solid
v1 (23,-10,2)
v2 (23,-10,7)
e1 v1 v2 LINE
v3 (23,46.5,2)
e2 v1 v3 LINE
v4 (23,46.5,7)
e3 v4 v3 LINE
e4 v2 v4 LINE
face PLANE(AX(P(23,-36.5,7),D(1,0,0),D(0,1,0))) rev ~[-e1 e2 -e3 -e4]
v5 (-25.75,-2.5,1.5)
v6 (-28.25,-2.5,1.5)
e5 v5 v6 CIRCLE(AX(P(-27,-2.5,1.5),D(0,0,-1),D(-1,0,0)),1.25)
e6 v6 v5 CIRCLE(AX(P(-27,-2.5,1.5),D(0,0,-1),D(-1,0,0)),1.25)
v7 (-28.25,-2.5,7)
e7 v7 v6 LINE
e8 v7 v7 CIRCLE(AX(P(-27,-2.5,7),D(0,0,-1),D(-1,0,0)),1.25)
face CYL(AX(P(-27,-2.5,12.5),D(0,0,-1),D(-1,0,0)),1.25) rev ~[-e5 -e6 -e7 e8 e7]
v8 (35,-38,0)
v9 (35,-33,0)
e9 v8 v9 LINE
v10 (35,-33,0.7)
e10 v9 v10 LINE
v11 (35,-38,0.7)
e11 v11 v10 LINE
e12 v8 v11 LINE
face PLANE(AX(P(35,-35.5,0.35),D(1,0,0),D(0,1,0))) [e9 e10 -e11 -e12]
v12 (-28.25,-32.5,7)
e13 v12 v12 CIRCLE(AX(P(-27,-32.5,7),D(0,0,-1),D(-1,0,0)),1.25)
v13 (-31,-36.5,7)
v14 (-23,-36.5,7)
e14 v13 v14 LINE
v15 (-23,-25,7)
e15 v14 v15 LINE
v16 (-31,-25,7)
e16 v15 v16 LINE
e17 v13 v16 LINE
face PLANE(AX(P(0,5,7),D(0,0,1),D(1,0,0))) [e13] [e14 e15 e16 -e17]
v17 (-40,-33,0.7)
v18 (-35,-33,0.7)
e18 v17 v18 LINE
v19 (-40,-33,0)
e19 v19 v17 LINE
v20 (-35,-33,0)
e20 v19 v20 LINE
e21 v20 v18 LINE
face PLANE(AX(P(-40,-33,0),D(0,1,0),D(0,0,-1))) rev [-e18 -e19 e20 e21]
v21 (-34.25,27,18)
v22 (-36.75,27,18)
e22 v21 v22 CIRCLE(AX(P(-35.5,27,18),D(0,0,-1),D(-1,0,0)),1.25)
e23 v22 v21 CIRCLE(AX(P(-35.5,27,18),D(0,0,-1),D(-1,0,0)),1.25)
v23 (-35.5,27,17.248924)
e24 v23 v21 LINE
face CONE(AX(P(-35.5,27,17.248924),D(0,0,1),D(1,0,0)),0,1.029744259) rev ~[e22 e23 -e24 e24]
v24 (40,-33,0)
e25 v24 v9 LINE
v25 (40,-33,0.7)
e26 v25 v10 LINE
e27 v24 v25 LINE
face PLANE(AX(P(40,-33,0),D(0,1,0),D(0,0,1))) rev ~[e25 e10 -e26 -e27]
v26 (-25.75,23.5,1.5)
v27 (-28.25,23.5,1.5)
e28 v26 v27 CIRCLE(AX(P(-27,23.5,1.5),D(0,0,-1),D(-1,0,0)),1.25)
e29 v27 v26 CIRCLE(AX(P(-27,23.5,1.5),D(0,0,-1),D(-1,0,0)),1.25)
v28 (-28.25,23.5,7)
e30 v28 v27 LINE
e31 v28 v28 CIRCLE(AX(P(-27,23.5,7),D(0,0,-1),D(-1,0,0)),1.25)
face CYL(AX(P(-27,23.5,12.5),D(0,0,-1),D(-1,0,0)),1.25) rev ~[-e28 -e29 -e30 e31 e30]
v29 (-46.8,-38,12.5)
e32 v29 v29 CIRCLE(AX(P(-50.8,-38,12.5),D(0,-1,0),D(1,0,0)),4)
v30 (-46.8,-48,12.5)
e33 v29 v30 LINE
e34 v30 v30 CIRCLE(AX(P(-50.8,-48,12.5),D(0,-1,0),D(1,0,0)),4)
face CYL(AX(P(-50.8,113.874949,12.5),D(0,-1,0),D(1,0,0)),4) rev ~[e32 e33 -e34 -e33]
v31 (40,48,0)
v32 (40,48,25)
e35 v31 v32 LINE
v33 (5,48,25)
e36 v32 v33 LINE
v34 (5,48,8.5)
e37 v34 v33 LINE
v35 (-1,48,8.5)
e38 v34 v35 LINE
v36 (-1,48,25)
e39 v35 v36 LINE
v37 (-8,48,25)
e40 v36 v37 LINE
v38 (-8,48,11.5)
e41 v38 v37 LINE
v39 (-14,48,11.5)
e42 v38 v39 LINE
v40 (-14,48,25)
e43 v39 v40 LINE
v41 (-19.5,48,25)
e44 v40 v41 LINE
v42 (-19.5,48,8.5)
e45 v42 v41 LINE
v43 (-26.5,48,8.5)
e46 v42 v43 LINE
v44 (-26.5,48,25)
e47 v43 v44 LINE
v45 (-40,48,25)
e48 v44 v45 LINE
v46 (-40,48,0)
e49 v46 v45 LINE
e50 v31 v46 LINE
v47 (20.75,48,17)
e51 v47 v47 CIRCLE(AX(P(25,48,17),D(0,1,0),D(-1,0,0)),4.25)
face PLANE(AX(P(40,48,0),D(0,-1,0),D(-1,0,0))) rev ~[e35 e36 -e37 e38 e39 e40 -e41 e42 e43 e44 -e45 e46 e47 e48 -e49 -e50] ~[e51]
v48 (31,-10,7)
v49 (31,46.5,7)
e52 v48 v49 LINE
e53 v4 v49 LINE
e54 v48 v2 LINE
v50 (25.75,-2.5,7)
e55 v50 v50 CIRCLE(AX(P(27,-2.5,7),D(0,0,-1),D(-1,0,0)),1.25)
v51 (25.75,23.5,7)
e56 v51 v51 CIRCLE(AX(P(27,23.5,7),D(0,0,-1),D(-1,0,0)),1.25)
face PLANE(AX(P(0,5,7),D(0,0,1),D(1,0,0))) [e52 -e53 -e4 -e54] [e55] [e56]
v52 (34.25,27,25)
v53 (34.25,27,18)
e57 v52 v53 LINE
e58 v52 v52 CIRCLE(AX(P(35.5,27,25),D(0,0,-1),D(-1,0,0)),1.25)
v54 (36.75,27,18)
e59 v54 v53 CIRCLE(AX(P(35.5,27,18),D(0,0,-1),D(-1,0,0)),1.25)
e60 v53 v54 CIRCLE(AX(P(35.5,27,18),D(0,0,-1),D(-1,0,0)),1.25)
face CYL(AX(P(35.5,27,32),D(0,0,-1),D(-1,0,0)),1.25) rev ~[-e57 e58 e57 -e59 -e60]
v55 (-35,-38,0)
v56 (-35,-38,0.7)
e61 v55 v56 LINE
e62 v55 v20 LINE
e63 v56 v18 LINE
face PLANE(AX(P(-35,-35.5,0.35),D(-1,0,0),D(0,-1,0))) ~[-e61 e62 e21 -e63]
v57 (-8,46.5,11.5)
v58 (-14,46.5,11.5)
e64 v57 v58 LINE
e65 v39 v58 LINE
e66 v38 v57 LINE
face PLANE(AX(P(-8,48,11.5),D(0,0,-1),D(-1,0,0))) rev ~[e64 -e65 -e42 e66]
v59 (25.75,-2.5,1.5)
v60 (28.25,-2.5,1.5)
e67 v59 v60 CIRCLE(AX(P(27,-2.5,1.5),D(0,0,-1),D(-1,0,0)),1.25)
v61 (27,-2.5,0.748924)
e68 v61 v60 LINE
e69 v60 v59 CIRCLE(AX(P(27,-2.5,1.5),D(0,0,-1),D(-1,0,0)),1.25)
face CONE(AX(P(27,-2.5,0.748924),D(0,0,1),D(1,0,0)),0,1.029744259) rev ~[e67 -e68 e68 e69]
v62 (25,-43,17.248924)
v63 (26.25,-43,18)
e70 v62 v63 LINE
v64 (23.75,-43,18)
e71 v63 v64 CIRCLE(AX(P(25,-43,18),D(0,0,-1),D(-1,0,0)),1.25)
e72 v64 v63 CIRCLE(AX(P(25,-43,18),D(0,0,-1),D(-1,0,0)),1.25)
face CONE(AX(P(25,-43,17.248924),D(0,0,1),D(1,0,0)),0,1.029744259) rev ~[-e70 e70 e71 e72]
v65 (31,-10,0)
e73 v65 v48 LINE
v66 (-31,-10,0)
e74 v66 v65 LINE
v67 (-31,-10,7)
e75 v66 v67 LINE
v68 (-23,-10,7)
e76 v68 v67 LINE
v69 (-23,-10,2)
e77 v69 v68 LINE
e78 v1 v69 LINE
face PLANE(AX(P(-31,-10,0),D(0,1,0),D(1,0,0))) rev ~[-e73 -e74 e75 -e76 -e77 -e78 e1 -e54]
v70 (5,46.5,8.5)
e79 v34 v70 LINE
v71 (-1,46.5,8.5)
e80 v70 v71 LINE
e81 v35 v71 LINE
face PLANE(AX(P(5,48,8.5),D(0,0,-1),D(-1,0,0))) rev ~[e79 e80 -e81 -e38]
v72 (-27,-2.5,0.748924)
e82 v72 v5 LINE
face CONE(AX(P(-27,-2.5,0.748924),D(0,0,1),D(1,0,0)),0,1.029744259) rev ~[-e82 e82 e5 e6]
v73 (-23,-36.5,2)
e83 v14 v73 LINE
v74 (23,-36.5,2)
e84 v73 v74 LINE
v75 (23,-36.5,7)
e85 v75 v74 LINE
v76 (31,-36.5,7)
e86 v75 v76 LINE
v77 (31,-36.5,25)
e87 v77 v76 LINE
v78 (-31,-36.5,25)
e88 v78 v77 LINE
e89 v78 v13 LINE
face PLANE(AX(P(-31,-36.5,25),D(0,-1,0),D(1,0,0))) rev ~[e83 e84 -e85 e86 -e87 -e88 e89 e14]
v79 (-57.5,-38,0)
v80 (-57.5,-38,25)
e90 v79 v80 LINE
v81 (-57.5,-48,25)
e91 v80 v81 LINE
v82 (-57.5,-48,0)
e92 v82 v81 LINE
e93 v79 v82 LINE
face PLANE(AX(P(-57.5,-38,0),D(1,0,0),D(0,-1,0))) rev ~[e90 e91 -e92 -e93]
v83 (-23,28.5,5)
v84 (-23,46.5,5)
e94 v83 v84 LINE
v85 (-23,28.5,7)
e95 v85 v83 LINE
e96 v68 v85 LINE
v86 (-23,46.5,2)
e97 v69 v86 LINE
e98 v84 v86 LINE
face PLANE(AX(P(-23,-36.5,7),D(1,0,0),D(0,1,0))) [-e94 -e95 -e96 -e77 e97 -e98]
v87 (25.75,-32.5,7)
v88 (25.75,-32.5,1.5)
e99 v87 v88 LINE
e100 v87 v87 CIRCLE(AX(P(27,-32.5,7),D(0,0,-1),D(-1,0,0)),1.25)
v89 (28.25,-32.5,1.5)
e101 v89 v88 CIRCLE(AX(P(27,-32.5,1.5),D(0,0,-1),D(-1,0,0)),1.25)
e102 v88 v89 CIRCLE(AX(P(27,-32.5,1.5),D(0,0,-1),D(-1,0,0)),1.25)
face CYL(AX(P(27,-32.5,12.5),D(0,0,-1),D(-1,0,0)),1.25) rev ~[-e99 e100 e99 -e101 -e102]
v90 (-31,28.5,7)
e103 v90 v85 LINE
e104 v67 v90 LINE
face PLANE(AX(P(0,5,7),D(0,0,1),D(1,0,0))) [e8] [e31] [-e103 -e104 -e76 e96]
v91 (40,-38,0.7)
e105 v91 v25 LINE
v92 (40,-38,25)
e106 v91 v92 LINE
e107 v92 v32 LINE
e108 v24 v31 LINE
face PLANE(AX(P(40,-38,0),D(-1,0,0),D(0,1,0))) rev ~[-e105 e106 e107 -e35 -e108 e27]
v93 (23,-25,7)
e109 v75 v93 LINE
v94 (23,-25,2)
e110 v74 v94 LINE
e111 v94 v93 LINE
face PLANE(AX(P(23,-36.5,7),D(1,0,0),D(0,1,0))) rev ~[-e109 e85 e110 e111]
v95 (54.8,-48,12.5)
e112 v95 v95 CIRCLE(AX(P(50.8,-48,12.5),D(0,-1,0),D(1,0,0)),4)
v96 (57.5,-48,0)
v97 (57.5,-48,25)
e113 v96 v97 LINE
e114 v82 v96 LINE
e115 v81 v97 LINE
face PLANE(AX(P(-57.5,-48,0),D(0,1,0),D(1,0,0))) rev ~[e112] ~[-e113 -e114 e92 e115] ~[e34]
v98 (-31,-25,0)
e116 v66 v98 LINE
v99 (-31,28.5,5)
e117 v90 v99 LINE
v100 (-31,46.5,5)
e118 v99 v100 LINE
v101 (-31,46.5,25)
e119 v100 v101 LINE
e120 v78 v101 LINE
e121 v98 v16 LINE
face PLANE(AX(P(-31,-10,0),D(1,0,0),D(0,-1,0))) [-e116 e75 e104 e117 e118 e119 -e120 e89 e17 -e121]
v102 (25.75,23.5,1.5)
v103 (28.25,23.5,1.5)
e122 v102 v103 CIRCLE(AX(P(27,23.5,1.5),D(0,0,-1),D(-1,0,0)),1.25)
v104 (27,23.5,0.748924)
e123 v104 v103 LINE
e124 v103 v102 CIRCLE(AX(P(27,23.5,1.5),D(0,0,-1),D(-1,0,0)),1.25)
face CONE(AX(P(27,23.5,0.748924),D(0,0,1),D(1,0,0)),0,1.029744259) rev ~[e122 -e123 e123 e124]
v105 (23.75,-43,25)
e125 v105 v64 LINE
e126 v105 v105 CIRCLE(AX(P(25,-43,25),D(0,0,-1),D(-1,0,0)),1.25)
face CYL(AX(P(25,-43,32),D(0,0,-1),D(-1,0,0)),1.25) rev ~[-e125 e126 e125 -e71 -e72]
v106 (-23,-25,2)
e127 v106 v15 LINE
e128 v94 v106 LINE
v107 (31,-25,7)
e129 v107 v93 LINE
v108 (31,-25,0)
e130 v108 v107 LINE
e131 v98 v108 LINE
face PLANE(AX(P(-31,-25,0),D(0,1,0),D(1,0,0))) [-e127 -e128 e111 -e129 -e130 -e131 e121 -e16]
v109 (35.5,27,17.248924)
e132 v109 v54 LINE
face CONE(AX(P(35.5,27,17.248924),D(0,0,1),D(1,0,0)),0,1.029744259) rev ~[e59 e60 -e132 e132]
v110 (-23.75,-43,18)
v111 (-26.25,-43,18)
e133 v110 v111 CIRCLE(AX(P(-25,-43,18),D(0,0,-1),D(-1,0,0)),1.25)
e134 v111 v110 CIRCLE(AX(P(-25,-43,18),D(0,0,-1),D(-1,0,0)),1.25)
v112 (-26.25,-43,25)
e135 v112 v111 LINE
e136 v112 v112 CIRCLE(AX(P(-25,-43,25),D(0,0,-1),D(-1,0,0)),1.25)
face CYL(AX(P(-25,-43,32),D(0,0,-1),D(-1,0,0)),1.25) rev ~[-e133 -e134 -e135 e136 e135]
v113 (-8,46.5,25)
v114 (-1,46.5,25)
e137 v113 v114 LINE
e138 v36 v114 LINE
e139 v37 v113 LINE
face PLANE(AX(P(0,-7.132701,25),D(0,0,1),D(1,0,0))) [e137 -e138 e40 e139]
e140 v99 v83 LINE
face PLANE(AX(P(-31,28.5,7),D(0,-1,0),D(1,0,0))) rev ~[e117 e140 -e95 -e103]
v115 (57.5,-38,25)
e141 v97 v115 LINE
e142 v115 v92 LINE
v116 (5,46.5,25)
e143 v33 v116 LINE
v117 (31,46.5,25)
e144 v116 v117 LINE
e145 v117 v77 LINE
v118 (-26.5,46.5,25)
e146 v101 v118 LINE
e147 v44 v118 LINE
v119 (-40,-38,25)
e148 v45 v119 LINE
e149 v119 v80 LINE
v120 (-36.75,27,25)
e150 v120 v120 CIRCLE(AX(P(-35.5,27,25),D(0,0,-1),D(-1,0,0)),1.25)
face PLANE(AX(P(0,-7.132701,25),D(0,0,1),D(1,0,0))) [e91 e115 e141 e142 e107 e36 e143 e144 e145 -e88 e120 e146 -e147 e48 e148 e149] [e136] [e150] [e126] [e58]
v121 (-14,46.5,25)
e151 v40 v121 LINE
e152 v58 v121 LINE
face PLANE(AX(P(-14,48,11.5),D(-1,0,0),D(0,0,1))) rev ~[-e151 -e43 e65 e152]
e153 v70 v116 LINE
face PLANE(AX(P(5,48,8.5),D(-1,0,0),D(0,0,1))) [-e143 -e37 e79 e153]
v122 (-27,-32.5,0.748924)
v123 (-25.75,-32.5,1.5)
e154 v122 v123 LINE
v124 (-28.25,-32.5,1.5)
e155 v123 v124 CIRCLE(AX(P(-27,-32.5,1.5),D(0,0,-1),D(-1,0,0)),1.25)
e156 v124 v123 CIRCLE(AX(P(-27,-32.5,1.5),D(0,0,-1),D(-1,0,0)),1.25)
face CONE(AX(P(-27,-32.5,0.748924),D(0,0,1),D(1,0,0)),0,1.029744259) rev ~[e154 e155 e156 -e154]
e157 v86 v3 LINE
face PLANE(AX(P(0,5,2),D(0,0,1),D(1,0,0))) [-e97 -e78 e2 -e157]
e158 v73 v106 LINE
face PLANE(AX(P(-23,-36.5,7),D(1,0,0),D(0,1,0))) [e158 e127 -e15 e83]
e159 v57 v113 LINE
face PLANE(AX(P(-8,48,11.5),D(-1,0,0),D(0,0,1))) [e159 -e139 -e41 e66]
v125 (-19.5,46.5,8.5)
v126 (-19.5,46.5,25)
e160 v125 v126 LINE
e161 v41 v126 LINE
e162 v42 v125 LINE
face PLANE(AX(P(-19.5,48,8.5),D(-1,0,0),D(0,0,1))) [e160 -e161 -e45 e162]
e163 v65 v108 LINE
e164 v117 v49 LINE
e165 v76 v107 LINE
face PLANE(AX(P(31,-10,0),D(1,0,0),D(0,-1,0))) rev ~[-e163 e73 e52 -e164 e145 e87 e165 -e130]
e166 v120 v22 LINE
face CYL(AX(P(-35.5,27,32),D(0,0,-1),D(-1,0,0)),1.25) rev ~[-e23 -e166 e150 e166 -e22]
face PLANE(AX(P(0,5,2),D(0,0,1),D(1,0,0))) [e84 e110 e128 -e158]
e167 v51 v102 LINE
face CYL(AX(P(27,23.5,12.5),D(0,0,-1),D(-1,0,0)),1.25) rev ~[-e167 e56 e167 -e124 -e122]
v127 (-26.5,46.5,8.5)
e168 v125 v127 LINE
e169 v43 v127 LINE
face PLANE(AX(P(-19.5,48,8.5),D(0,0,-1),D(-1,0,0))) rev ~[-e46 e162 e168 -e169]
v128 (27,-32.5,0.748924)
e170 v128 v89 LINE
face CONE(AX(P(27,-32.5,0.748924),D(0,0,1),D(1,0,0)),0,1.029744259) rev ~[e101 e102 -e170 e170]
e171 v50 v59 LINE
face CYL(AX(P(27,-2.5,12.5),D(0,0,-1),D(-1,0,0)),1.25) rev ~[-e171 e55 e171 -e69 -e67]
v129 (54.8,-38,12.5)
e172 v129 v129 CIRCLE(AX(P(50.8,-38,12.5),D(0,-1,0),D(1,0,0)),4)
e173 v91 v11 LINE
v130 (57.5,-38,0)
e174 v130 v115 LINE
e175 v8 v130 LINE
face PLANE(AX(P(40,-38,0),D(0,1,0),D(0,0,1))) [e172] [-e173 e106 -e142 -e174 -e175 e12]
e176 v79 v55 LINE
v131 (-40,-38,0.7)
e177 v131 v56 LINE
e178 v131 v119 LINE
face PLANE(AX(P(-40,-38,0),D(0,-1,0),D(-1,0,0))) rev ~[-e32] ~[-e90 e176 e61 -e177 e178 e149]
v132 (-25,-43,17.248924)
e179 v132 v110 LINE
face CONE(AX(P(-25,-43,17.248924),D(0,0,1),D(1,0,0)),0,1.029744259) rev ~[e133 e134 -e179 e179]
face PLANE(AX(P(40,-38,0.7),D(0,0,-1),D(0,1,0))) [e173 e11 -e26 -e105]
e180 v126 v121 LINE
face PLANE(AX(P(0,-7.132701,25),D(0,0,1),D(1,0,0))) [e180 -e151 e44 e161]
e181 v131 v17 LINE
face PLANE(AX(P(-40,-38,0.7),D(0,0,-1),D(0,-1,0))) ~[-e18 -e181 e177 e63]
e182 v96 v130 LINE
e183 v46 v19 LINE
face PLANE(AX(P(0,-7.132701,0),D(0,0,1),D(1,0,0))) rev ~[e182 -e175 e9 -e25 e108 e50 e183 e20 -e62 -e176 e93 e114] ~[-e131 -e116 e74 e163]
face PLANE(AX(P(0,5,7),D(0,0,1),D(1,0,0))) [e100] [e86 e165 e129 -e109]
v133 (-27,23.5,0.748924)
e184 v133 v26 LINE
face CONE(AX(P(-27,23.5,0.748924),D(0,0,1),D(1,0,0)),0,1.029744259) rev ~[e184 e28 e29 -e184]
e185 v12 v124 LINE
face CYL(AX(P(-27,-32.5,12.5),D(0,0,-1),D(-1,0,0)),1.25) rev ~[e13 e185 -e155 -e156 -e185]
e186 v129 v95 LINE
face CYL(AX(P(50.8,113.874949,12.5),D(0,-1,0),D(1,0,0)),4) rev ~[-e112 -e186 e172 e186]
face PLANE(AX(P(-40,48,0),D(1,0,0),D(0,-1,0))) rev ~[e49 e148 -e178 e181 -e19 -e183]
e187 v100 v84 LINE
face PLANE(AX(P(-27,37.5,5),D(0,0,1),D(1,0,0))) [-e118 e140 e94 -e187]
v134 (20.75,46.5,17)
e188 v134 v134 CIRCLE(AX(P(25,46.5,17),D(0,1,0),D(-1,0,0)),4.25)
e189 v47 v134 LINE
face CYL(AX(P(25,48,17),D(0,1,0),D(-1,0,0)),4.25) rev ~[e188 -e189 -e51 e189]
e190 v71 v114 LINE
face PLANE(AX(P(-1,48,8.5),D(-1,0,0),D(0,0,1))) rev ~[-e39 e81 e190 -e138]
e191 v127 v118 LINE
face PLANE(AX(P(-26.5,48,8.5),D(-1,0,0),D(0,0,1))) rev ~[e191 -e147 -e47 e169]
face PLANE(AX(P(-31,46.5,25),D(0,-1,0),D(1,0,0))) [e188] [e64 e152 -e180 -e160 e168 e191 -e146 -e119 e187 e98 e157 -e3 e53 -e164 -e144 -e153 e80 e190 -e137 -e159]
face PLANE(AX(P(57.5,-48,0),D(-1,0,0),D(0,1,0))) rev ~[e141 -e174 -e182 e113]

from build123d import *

# Parameters (mm, degrees)
F1_DEPTH  = 25
F2_W      = 62
F2_H      = 83
F3_DEPTH  = 18
F4_W      = 46
F4_H      = 83
F5_DEPTH  = 5
F7_D      = 2.5
F7_DEPTH  = 5.5
F7_TIP    = 0.7510757738
F8_W      = 62
F8_H      = 15
F9_DEPTH  = 25.001
F11_D     = 8
F12_W     = 6
F12_H     = 16.5
F12_H_2   = 13.5
F12_W_2   = 7
F13_DEPTH = 1.5
F14_W     = 8
F14_H     = 18
F15_DEPTH = 2
F16_R     = 4.25
F17_DEPTH = 1.5
F18_W     = 5
F18_H     = 0.7
F19_DEPTH = 5
F21_D     = 2.5
F21_DEPTH = 7
F21_TIP   = 0.7510757738


# Not quite as in the source:
# - a pattern or mirror of a feature is missing from the dataset's text; its kind, count and spacing are read off the source's solid


with BuildPart() as f1:
    # F0 (on Top) → F1 (new body)
    with BuildSketch(Plane.XY):
        Polygon((40, 48), (-40, 48), (-40, -38), (-57.5, -38), (-57.5, -48), (57.5, -48), (57.5, -38), (40, -38), align=None)
    extrude(amount=F1_DEPTH)

    # F2 (on face) → F3 (cut)
    with BuildSketch(Plane.XY.offset(25)):
        with Locations((0, 5)):
            Rectangle(F2_W, F2_H)
    extrude(amount=-F3_DEPTH, mode=Mode.SUBTRACT)

    # F4 (on face) → F5 (cut)
    with BuildSketch(Plane.XY.offset(7)):
        with Locations((0, 5)):
            Rectangle(F4_W, F4_H)
    extrude(amount=-F5_DEPTH, mode=Mode.SUBTRACT)

    # F7
    with Locations(Plane.XY.offset(7)):
        with Locations((-27, -32.5), (-27, -2.5), (-27, 23.5), (27, -32.5), (27, -2.5), (27, 23.5)):
            Hole(F7_D / 2, depth=F7_DEPTH)
            with Locations((0, 0, -(F7_DEPTH + F7_TIP / 2))):  # 118° drill point
                Cone(0, F7_D / 2, F7_TIP, mode=Mode.SUBTRACT)

    # F8 (on face) → F9 (cut, through all)
    with BuildSketch(Plane(origin=(0, 0, 0), x_dir=(1, 0, 0), z_dir=(0, 0, -1))):
        with Locations((0, 17.5)):
            Rectangle(F8_W, F8_H)
    extrude(amount=-F9_DEPTH, mode=Mode.SUBTRACT)

    # F11 (through all)
    with Locations(Plane(origin=(0, -38, 0), x_dir=(-1, 0, 0), z_dir=(0, 1, 0))):
        with Locations((50.8, 12.5), (-50.8, 12.5)):
            Hole(F11_D / 2)

    # F12 (on face) → F13 (cut, through all)
    with BuildSketch(Plane(origin=(0, 48, 0), x_dir=(-1, 0, 0), z_dir=(0, 1, 0))):
        with Locations((-2, 16.75)):
            Rectangle(F12_W, F12_H)
        with Locations((11, 18.25)):
            Rectangle(F12_W, F12_H_2)
        with Locations((23, 16.75)):
            Rectangle(F12_W_2, F12_H)
    extrude(amount=-F13_DEPTH, mode=Mode.SUBTRACT)

    # F14 (on face) → F15 (cut)
    with BuildSketch(Plane.XY.offset(7)):
        with Locations((-27, 37.5)):
            Rectangle(F14_W, F14_H)
    extrude(amount=-F15_DEPTH, mode=Mode.SUBTRACT)

    # F16 (on face) → F17 (cut, through all)
    with BuildSketch(Plane(origin=(0, 48, 0), x_dir=(-1, 0, 0), z_dir=(0, 1, 0))):
        with Locations((-25, 17)):
            Circle(F16_R)
    extrude(amount=-F17_DEPTH, mode=Mode.SUBTRACT)

    # F18 (on face) → F19 (cut)
    with BuildSketch(Plane.YZ.offset(40)):
        with Locations((-35.5, 0.35)):
            Rectangle(F18_W, F18_H)
    f19 = extrude(amount=-F19_DEPTH, mode=Mode.SUBTRACT)

    # F19_copies: F19 across plane
    add(f19.mirror(Plane(origin=(0, 0, 0), x_dir=(0, 0, -1), z_dir=(-1, 0, 0))), mode=Mode.SUBTRACT)

    # F21
    with Locations(Plane.XY.offset(25)):
        with Locations((25, -43), (-25, -43), (35.5, 27), (-35.5, 27)):
            Hole(F21_D / 2, depth=F21_DEPTH)
            with Locations((0, 0, -(F21_DEPTH + F21_TIP / 2))):  # 118° drill point
                Cone(0, F21_D / 2, F21_TIP, mode=Mode.SUBTRACT)


solid = f1.part
